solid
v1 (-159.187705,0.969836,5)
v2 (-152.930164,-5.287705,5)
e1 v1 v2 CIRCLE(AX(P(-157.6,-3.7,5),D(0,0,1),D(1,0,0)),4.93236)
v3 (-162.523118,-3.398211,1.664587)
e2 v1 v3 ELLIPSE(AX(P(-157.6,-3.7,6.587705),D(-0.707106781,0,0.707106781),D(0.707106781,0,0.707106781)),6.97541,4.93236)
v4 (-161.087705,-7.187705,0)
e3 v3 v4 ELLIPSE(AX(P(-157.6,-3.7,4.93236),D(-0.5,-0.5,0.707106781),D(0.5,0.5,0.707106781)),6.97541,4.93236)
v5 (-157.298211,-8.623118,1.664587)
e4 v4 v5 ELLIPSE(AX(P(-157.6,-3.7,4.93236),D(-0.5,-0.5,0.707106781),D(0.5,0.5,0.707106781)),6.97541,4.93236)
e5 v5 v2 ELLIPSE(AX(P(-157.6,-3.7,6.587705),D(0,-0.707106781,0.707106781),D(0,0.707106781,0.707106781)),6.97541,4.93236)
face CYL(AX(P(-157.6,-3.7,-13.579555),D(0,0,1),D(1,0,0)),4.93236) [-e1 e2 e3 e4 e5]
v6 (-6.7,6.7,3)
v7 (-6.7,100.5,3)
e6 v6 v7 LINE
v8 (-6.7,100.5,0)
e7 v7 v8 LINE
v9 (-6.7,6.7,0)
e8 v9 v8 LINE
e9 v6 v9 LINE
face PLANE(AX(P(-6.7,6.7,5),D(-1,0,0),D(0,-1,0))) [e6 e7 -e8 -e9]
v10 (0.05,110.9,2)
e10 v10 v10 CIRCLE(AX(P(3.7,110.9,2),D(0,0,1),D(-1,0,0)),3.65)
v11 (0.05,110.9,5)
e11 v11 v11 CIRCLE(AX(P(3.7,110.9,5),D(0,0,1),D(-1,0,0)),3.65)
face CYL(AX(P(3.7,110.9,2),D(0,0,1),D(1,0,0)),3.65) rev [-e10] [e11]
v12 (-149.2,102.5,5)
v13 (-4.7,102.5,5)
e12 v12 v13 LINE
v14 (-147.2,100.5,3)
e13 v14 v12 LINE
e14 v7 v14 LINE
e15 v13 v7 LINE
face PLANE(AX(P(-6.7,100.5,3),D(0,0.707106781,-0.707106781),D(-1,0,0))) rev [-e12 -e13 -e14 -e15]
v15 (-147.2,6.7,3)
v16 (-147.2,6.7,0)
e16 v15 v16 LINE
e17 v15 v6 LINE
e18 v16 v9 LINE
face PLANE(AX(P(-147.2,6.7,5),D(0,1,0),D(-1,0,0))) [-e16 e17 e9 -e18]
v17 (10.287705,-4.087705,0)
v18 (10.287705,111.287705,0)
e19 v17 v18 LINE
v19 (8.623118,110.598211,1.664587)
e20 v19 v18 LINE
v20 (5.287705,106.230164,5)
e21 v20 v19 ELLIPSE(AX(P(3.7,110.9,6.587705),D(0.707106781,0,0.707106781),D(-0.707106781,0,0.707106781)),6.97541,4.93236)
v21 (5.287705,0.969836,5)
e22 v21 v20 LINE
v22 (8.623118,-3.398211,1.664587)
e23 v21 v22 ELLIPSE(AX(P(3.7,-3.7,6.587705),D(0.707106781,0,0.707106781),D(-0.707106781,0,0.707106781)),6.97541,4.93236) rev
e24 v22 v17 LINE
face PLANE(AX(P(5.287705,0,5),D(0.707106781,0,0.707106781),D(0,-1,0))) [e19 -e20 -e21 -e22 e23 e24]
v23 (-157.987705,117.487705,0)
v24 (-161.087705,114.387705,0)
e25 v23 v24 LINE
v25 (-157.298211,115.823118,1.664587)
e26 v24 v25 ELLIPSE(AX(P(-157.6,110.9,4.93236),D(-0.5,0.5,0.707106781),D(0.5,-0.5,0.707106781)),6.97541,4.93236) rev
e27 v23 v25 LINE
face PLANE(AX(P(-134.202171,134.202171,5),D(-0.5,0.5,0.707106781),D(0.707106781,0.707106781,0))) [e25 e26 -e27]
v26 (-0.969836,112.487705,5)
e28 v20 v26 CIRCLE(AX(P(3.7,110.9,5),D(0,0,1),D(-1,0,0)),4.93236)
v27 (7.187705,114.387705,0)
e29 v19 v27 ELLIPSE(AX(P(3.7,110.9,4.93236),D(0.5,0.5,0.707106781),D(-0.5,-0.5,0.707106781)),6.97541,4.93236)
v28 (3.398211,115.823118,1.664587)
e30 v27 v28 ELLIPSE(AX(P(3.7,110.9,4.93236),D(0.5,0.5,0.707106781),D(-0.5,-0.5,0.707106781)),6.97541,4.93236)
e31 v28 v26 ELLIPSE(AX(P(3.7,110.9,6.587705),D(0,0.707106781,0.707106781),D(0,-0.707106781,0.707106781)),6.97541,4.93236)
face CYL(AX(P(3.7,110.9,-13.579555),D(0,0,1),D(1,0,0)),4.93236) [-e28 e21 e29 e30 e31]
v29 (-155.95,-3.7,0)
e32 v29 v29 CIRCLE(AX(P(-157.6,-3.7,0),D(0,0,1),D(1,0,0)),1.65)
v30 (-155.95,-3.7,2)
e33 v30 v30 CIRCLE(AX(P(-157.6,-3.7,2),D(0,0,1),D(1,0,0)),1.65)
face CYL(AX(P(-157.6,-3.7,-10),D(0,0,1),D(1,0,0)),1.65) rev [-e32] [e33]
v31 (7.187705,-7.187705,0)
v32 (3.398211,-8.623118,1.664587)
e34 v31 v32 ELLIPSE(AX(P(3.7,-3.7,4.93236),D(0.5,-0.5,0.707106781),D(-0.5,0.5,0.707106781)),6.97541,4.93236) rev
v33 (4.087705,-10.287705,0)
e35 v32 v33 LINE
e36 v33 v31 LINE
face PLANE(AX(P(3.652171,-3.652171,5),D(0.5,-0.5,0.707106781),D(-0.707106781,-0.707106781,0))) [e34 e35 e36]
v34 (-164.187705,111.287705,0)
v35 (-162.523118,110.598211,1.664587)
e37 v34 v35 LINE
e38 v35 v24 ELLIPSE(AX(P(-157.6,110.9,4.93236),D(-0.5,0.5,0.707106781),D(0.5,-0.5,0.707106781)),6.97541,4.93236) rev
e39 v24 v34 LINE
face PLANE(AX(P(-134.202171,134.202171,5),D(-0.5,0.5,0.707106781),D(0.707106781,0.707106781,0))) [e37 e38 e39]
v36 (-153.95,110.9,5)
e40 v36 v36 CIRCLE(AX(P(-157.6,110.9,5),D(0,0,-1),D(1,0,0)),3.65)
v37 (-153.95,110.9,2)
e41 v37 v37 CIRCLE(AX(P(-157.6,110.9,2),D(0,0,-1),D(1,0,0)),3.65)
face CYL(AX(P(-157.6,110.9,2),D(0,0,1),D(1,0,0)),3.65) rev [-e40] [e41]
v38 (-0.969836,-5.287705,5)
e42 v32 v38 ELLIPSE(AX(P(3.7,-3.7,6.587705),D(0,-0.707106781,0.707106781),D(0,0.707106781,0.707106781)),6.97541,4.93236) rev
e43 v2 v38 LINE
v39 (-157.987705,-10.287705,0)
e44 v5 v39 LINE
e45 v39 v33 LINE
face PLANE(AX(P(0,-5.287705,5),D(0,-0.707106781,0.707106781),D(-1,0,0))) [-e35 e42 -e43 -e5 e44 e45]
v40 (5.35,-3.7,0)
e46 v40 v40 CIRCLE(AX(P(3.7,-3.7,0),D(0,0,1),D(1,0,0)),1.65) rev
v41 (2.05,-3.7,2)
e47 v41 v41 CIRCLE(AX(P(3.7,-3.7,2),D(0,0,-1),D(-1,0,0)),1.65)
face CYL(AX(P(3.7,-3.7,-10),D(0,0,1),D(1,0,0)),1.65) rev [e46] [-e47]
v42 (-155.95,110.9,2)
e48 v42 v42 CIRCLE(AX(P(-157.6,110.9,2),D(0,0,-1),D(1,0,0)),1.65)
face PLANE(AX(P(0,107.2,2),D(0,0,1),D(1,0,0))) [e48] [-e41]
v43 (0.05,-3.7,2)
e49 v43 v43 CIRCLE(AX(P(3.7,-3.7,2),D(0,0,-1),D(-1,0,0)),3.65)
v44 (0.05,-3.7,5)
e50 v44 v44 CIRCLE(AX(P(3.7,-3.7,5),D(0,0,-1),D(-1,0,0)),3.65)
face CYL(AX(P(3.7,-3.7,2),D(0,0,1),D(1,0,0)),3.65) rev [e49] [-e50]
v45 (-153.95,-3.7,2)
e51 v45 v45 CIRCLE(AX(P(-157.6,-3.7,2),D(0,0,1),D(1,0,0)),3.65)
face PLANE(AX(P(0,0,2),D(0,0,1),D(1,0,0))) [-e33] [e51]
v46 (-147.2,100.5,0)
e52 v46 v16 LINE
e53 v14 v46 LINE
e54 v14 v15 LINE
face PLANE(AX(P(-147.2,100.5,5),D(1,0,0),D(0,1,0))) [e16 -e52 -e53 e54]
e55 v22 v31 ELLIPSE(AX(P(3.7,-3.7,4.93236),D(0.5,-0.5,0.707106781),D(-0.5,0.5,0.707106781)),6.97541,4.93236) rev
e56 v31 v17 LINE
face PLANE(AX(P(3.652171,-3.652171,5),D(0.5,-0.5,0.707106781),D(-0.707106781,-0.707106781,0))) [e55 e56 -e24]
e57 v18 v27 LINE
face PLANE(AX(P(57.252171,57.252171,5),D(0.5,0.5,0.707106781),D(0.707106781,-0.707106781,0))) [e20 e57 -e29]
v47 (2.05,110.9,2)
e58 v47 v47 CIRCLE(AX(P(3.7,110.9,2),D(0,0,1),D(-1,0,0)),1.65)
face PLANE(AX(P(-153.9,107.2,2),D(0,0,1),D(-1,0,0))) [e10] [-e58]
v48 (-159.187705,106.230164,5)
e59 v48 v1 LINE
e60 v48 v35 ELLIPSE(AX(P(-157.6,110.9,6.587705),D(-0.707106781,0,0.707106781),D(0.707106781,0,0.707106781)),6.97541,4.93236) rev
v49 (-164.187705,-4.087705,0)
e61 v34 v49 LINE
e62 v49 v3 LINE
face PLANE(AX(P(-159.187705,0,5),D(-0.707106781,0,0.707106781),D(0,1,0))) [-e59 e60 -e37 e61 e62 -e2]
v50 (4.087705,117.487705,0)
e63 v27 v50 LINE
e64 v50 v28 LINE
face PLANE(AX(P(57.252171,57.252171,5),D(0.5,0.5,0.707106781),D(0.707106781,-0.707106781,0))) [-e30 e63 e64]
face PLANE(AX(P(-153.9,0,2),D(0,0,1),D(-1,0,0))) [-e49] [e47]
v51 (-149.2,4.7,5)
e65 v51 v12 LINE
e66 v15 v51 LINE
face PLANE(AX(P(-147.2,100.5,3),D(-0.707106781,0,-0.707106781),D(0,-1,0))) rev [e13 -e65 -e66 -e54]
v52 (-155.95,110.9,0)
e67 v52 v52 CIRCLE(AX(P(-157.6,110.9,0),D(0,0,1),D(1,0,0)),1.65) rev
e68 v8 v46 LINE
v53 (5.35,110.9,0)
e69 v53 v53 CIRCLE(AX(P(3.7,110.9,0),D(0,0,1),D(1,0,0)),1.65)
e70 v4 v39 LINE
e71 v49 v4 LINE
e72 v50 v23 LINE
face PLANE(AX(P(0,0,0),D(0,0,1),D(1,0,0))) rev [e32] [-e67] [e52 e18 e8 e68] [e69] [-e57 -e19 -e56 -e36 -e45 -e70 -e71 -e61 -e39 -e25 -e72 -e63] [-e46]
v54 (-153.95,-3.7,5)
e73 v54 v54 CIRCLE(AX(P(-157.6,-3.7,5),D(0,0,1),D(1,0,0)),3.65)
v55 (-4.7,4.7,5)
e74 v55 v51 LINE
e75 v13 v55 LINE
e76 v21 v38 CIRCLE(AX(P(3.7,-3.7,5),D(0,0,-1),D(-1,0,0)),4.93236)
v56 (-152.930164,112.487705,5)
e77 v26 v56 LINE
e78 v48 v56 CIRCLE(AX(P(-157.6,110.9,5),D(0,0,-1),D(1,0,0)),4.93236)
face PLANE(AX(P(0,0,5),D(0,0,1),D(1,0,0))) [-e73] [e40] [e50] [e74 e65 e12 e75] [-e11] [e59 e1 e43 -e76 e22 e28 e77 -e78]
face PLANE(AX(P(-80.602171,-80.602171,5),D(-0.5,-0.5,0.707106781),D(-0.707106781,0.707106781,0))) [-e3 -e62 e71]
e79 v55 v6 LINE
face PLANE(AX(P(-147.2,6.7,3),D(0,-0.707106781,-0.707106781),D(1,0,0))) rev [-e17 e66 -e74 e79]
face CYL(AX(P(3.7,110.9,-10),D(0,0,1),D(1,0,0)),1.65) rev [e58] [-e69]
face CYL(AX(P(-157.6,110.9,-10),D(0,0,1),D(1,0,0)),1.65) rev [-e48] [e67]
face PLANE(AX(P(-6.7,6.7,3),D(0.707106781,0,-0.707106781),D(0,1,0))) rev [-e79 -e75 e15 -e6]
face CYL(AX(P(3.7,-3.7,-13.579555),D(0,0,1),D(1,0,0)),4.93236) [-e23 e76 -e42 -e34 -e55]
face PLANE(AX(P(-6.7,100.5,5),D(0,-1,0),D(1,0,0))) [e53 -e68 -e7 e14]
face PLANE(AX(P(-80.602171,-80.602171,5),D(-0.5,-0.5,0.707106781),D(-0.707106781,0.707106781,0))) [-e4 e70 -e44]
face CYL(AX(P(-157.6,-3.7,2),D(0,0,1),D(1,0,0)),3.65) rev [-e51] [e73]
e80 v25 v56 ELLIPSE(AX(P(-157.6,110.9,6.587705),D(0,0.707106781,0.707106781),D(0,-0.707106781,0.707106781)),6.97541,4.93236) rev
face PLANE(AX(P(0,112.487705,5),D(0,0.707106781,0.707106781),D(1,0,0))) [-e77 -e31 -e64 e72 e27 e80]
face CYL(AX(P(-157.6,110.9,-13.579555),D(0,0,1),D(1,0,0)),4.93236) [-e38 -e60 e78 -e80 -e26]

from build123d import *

# Parameters (mm, degrees)
SKETCH1_W                                  = 140.5
SKETCH1_H                                  = 93.8
BOSS_EXTRUDE1_DEPTH                        = 5
CHAMFER1_SIZE                              = 5
CHAMFER2_SIZE                              = 2
SKETCH2_R                                  = 1.65
CUT_EXTRUDE1_DEPTH                         = 15
BOSS_EXTRUDE2_DEPTH                        = 5
CUT_EXTRUDE2_DEPTH                         = 3
MIRROR1_AT_THE_SECOND_PLANE_COPY_1_SKETC_R = 1.65
MIRROR1_AT_THE_SECOND_PLANE_COPY_1_DEPTH   = 15
MIRROR1_AT_THE_SECOND_PLANE_COPY_2_DEPTH   = 5
MIRROR1_AT_THE_SECOND_PLANE_COPY_3_DEPTH   = 3


with BuildPart() as part:
    # Sketch1 → Boss-Extrude1 (new body)
    with BuildSketch(Plane.XY):
        Polygon((-157.987704918, -10.287704918), (4.087704918, -10.287704918), (10.287704918, -4.087704918), (10.287704918, 111.287704918), (4.087704918, 117.487704918), (-157.987704918, 117.487704918), (-164.187704918, 111.287704918), (-164.187704918, -4.087704918), align=None)
        with Locations((-76.95, 53.6)):
            Rectangle(SKETCH1_W, SKETCH1_H, mode=Mode.SUBTRACT)
    extrude(amount=BOSS_EXTRUDE1_DEPTH)

    # Chamfer1
    chamfer1_edges = [part.edges().sort_by_distance(p)[0] for p in [
        (7.187704918, 114.387704918, 5),
        (10.287704918, 53.6, 5),
        (7.187704918, -7.187704918, 5),
        (-76.95, -10.287704918, 5),
        (-161.087704918, -7.187704918, 5),
        (-164.187704918, 53.6, 5),
        (-76.95, 117.487704918, 5),
        (-161.087704918, 114.387704918, 5),
    ]]
    chamfer(chamfer1_edges, length=CHAMFER1_SIZE - 0.0001)  # a hair under: the kernel refuses the full size

    # Chamfer2
    chamfer2_edges = [part.edges().sort_by_distance(p)[0] for p in [
        (-6.7, 53.6, 5),
        (-76.95, 100.5, 5),
        (-147.2, 53.6, 5),
        (-76.95, 6.7, 5),
    ]]
    chamfer(chamfer2_edges, length=CHAMFER2_SIZE)

    # Sketch2 → Cut-Extrude1 (cut)
    with BuildSketch(Plane.XY.offset(5)):
        with Locations((-157.6, -3.7)):
            Circle(SKETCH2_R)
    cut_extrude1 = extrude(amount=-CUT_EXTRUDE1_DEPTH, mode=Mode.SUBTRACT)

    # Sketch2<3> → Boss-Extrude2 (add)
    with BuildSketch(Plane.XY.offset(5)):
        with BuildLine():
            ThreePointArc((-159.187704918, -0.413407069), (-155.659977185, -0.608267237), (-153.95, -3.7))
            ThreePointArc((-153.95, -3.7), (-154.042011509, -4.514381914), (-154.313407069, -5.287704918))
            Line((-154.313407069, -5.287704918), (-152.930164426, -5.287704918))
            ThreePointArc((-152.930164426, -5.287704918), (-152.733713968, -4.504631246), (-152.667640403, -3.7))
            ThreePointArc((-152.667640403, -3.7), (-154.727976358, 0.309944063), (-159.187704918, 0.969835574))
            Line((-159.187704918, 0.969835574), (-159.187704918, -0.413407069))
        make_face()
        with BuildLine():
            ThreePointArc((-154.313407069, -5.287704918), (-160.180939751, -6.280939751), (-159.187704918, -0.413407069))
            Line((-159.187704918, -0.413407069), (-159.187704918, 0.969835574))
            ThreePointArc((-159.187704918, 0.969835574), (-161.087704918, -7.187704918), (-152.930164426, -5.287704918))
            Line((-152.930164426, -5.287704918), (-154.313407069, -5.287704918))
        make_face()
        with BuildLine():
            ThreePointArc((-154.313407069, -5.287704918), (-154.042011509, -4.514381914), (-153.95, -3.7))
            ThreePointArc((-153.95, -3.7), (-155.659977185, -0.608267237), (-159.187704918, -0.413407069))
            Line((-159.187704918, -0.413407069), (-159.187704918, -2.016637106))
            Line((-159.187704918, -2.016637106), (-158.717916434, -2.486425591))
            ThreePointArc((-158.717916434, -2.486425591), (-156.937452687, -2.188864315), (-155.95, -3.7))
            ThreePointArc((-155.95, -3.7), (-156.062974012, -4.300042592), (-156.386425591, -4.817916434))
            Line((-156.386425591, -4.817916434), (-155.916637106, -5.287704918))
            Line((-155.916637106, -5.287704918), (-154.313407069, -5.287704918))
        make_face()
        with BuildLine():
            Line((-159.187704918, -2.016637106), (-159.187704918, -0.413407069))
            ThreePointArc((-159.187704918, -0.413407069), (-160.180939751, -6.280939751), (-154.313407069, -5.287704918))
            Line((-154.313407069, -5.287704918), (-155.916637106, -5.287704918))
            Line((-155.916637106, -5.287704918), (-156.386425591, -4.817916434))
            ThreePointArc((-156.386425591, -4.817916434), (-158.766726189, -4.866726189), (-158.717916434, -2.486425591))
            Line((-158.717916434, -2.486425591), (-159.187704918, -2.016637106))
        make_face()
    boss_extrude2 = extrude(amount=-BOSS_EXTRUDE2_DEPTH)

    # Sketch2<4> → Cut-Extrude2 (cut)
    with BuildSketch(Plane.XY.offset(5)):
        with BuildLine():
            ThreePointArc((-154.313407069, -5.287704918), (-154.042011509, -4.514381914), (-153.95, -3.7))
            ThreePointArc((-153.95, -3.7), (-155.659977185, -0.608267237), (-159.187704918, -0.413407069))
            Line((-159.187704918, -0.413407069), (-159.187704918, -2.016637106))
            Line((-159.187704918, -2.016637106), (-158.717916434, -2.486425591))
            ThreePointArc((-158.717916434, -2.486425591), (-156.937452687, -2.188864315), (-155.95, -3.7))
            ThreePointArc((-155.95, -3.7), (-156.062974012, -4.300042592), (-156.386425591, -4.817916434))
            Line((-156.386425591, -4.817916434), (-155.916637106, -5.287704918))
            Line((-155.916637106, -5.287704918), (-154.313407069, -5.287704918))
        make_face()
        with BuildLine():
            Line((-159.187704918, -2.016637106), (-159.187704918, -0.413407069))
            ThreePointArc((-159.187704918, -0.413407069), (-160.180939751, -6.280939751), (-154.313407069, -5.287704918))
            Line((-154.313407069, -5.287704918), (-155.916637106, -5.287704918))
            Line((-155.916637106, -5.287704918), (-156.386425591, -4.817916434))
            ThreePointArc((-156.386425591, -4.817916434), (-158.766726189, -4.866726189), (-158.717916434, -2.486425591))
            Line((-158.717916434, -2.486425591), (-159.187704918, -2.016637106))
        make_face()
    cut_extrude2 = extrude(amount=-CUT_EXTRUDE2_DEPTH, mode=Mode.SUBTRACT)

    # Mirror1: Cut-Extrude1, Boss-Extrude2, Cut-Extrude2 across plane
    add(cut_extrude1.mirror(Plane(origin=(-76.95, 0, 0), x_dir=(0, 0, 1), z_dir=(1, 0, 0))), mode=Mode.SUBTRACT)
    add(boss_extrude2.mirror(Plane(origin=(-76.95, 0, 0), x_dir=(0, 0, 1), z_dir=(1, 0, 0))))
    add(cut_extrude2.mirror(Plane(origin=(-76.95, 0, 0), x_dir=(0, 0, 1), z_dir=(1, 0, 0))), mode=Mode.SUBTRACT)

    # Mirror1 at the second plane: Cut-Extrude1, Boss-Extrude2, Cut-Extrude2 across plane
    add(cut_extrude1.mirror(Plane(origin=(0, 53.6, 0), x_dir=(0, 0, 1), z_dir=(0, -1, 0))), mode=Mode.SUBTRACT)
    add(boss_extrude2.mirror(Plane(origin=(0, 53.6, 0), x_dir=(0, 0, 1), z_dir=(0, -1, 0))))
    add(cut_extrude2.mirror(Plane(origin=(0, 53.6, 0), x_dir=(0, 0, 1), z_dir=(0, -1, 0))), mode=Mode.SUBTRACT)

    # Mirror1 at the second plane copy 1 sketc → Mirror1 at the second plane copy 1 (cut)
    with BuildSketch(Plane(origin=(-153.9, 107.2, 5), x_dir=(-1, 0, 0), z_dir=(0, 0, 1))):
        with Locations((-157.6, -3.7)):
            Circle(MIRROR1_AT_THE_SECOND_PLANE_COPY_1_SKETC_R)
    extrude(amount=-MIRROR1_AT_THE_SECOND_PLANE_COPY_1_DEPTH, mode=Mode.SUBTRACT)

    # Mirror1 at the second plane copy 2 sketc → Mirror1 at the second plane copy 2 (add)
    with BuildSketch(Plane(origin=(-153.9, 107.2, 5), x_dir=(-1, 0, 0), z_dir=(0, 0, 1))):
        with BuildLine():
            ThreePointArc((-159.187704918, -0.413407069), (-155.659977185, -0.608267237), (-153.95, -3.7))
            ThreePointArc((-153.95, -3.7), (-154.042011509, -4.514381914), (-154.313407069, -5.287704918))
            Line((-154.313407069, -5.287704918), (-152.930164426, -5.287704918))
            ThreePointArc((-152.930164426, -5.287704918), (-152.733713968, -4.504631246), (-152.667640403, -3.7))
            ThreePointArc((-152.667640403, -3.7), (-154.727976358, 0.309944063), (-159.187704918, 0.969835574))
            Line((-159.187704918, 0.969835574), (-159.187704918, -0.413407069))
        make_face()
        with BuildLine():
            ThreePointArc((-154.313407069, -5.287704918), (-160.180939751, -6.280939751), (-159.187704918, -0.413407069))
            Line((-159.187704918, -0.413407069), (-159.187704918, 0.969835574))
            ThreePointArc((-159.187704918, 0.969835574), (-161.087704918, -7.187704918), (-152.930164426, -5.287704918))
            Line((-152.930164426, -5.287704918), (-154.313407069, -5.287704918))
        make_face()
        with BuildLine():
            ThreePointArc((-154.313407069, -5.287704918), (-154.042011509, -4.514381914), (-153.95, -3.7))
            ThreePointArc((-153.95, -3.7), (-155.659977185, -0.608267237), (-159.187704918, -0.413407069))
            Line((-159.187704918, -0.413407069), (-159.187704918, -2.016637106))
            Line((-159.187704918, -2.016637106), (-158.717916434, -2.486425591))
            ThreePointArc((-158.717916434, -2.486425591), (-156.937452687, -2.188864315), (-155.95, -3.7))
            ThreePointArc((-155.95, -3.7), (-156.062974012, -4.300042592), (-156.386425591, -4.817916434))
            Line((-156.386425591, -4.817916434), (-155.916637106, -5.287704918))
            Line((-155.916637106, -5.287704918), (-154.313407069, -5.287704918))
        make_face()
        with BuildLine():
            Line((-159.187704918, -2.016637106), (-159.187704918, -0.413407069))
            ThreePointArc((-159.187704918, -0.413407069), (-160.180939751, -6.280939751), (-154.313407069, -5.287704918))
            Line((-154.313407069, -5.287704918), (-155.916637106, -5.287704918))
            Line((-155.916637106, -5.287704918), (-156.386425591, -4.817916434))
            ThreePointArc((-156.386425591, -4.817916434), (-158.766726189, -4.866726189), (-158.717916434, -2.486425591))
            Line((-158.717916434, -2.486425591), (-159.187704918, -2.016637106))
        make_face()
    extrude(amount=-MIRROR1_AT_THE_SECOND_PLANE_COPY_2_DEPTH)

    # Mirror1 at the second plane copy 3 sketc → Mirror1 at the second plane copy 3 (cut)
    with BuildSketch(Plane(origin=(-153.9, 107.2, 5), x_dir=(-1, 0, 0), z_dir=(0, 0, 1))):
        with BuildLine():
            ThreePointArc((-154.313407069, -5.287704918), (-154.042011509, -4.514381914), (-153.95, -3.7))
            ThreePointArc((-153.95, -3.7), (-155.659977185, -0.608267237), (-159.187704918, -0.413407069))
            Line((-159.187704918, -0.413407069), (-159.187704918, -2.016637106))
            Line((-159.187704918, -2.016637106), (-158.717916434, -2.486425591))
            ThreePointArc((-158.717916434, -2.486425591), (-156.937452687, -2.188864315), (-155.95, -3.7))
            ThreePointArc((-155.95, -3.7), (-156.062974012, -4.300042592), (-156.386425591, -4.817916434))
            Line((-156.386425591, -4.817916434), (-155.916637106, -5.287704918))
            Line((-155.916637106, -5.287704918), (-154.313407069, -5.287704918))
        make_face()
        with BuildLine():
            Line((-159.187704918, -2.016637106), (-159.187704918, -0.413407069))
            ThreePointArc((-159.187704918, -0.413407069), (-160.180939751, -6.280939751), (-154.313407069, -5.287704918))
            Line((-154.313407069, -5.287704918), (-155.916637106, -5.287704918))
            Line((-155.916637106, -5.287704918), (-156.386425591, -4.817916434))
            ThreePointArc((-156.386425591, -4.817916434), (-158.766726189, -4.866726189), (-158.717916434, -2.486425591))
            Line((-158.717916434, -2.486425591), (-159.187704918, -2.016637106))
        make_face()
    extrude(amount=-MIRROR1_AT_THE_SECOND_PLANE_COPY_3_DEPTH, mode=Mode.SUBTRACT)


solid = part.part
